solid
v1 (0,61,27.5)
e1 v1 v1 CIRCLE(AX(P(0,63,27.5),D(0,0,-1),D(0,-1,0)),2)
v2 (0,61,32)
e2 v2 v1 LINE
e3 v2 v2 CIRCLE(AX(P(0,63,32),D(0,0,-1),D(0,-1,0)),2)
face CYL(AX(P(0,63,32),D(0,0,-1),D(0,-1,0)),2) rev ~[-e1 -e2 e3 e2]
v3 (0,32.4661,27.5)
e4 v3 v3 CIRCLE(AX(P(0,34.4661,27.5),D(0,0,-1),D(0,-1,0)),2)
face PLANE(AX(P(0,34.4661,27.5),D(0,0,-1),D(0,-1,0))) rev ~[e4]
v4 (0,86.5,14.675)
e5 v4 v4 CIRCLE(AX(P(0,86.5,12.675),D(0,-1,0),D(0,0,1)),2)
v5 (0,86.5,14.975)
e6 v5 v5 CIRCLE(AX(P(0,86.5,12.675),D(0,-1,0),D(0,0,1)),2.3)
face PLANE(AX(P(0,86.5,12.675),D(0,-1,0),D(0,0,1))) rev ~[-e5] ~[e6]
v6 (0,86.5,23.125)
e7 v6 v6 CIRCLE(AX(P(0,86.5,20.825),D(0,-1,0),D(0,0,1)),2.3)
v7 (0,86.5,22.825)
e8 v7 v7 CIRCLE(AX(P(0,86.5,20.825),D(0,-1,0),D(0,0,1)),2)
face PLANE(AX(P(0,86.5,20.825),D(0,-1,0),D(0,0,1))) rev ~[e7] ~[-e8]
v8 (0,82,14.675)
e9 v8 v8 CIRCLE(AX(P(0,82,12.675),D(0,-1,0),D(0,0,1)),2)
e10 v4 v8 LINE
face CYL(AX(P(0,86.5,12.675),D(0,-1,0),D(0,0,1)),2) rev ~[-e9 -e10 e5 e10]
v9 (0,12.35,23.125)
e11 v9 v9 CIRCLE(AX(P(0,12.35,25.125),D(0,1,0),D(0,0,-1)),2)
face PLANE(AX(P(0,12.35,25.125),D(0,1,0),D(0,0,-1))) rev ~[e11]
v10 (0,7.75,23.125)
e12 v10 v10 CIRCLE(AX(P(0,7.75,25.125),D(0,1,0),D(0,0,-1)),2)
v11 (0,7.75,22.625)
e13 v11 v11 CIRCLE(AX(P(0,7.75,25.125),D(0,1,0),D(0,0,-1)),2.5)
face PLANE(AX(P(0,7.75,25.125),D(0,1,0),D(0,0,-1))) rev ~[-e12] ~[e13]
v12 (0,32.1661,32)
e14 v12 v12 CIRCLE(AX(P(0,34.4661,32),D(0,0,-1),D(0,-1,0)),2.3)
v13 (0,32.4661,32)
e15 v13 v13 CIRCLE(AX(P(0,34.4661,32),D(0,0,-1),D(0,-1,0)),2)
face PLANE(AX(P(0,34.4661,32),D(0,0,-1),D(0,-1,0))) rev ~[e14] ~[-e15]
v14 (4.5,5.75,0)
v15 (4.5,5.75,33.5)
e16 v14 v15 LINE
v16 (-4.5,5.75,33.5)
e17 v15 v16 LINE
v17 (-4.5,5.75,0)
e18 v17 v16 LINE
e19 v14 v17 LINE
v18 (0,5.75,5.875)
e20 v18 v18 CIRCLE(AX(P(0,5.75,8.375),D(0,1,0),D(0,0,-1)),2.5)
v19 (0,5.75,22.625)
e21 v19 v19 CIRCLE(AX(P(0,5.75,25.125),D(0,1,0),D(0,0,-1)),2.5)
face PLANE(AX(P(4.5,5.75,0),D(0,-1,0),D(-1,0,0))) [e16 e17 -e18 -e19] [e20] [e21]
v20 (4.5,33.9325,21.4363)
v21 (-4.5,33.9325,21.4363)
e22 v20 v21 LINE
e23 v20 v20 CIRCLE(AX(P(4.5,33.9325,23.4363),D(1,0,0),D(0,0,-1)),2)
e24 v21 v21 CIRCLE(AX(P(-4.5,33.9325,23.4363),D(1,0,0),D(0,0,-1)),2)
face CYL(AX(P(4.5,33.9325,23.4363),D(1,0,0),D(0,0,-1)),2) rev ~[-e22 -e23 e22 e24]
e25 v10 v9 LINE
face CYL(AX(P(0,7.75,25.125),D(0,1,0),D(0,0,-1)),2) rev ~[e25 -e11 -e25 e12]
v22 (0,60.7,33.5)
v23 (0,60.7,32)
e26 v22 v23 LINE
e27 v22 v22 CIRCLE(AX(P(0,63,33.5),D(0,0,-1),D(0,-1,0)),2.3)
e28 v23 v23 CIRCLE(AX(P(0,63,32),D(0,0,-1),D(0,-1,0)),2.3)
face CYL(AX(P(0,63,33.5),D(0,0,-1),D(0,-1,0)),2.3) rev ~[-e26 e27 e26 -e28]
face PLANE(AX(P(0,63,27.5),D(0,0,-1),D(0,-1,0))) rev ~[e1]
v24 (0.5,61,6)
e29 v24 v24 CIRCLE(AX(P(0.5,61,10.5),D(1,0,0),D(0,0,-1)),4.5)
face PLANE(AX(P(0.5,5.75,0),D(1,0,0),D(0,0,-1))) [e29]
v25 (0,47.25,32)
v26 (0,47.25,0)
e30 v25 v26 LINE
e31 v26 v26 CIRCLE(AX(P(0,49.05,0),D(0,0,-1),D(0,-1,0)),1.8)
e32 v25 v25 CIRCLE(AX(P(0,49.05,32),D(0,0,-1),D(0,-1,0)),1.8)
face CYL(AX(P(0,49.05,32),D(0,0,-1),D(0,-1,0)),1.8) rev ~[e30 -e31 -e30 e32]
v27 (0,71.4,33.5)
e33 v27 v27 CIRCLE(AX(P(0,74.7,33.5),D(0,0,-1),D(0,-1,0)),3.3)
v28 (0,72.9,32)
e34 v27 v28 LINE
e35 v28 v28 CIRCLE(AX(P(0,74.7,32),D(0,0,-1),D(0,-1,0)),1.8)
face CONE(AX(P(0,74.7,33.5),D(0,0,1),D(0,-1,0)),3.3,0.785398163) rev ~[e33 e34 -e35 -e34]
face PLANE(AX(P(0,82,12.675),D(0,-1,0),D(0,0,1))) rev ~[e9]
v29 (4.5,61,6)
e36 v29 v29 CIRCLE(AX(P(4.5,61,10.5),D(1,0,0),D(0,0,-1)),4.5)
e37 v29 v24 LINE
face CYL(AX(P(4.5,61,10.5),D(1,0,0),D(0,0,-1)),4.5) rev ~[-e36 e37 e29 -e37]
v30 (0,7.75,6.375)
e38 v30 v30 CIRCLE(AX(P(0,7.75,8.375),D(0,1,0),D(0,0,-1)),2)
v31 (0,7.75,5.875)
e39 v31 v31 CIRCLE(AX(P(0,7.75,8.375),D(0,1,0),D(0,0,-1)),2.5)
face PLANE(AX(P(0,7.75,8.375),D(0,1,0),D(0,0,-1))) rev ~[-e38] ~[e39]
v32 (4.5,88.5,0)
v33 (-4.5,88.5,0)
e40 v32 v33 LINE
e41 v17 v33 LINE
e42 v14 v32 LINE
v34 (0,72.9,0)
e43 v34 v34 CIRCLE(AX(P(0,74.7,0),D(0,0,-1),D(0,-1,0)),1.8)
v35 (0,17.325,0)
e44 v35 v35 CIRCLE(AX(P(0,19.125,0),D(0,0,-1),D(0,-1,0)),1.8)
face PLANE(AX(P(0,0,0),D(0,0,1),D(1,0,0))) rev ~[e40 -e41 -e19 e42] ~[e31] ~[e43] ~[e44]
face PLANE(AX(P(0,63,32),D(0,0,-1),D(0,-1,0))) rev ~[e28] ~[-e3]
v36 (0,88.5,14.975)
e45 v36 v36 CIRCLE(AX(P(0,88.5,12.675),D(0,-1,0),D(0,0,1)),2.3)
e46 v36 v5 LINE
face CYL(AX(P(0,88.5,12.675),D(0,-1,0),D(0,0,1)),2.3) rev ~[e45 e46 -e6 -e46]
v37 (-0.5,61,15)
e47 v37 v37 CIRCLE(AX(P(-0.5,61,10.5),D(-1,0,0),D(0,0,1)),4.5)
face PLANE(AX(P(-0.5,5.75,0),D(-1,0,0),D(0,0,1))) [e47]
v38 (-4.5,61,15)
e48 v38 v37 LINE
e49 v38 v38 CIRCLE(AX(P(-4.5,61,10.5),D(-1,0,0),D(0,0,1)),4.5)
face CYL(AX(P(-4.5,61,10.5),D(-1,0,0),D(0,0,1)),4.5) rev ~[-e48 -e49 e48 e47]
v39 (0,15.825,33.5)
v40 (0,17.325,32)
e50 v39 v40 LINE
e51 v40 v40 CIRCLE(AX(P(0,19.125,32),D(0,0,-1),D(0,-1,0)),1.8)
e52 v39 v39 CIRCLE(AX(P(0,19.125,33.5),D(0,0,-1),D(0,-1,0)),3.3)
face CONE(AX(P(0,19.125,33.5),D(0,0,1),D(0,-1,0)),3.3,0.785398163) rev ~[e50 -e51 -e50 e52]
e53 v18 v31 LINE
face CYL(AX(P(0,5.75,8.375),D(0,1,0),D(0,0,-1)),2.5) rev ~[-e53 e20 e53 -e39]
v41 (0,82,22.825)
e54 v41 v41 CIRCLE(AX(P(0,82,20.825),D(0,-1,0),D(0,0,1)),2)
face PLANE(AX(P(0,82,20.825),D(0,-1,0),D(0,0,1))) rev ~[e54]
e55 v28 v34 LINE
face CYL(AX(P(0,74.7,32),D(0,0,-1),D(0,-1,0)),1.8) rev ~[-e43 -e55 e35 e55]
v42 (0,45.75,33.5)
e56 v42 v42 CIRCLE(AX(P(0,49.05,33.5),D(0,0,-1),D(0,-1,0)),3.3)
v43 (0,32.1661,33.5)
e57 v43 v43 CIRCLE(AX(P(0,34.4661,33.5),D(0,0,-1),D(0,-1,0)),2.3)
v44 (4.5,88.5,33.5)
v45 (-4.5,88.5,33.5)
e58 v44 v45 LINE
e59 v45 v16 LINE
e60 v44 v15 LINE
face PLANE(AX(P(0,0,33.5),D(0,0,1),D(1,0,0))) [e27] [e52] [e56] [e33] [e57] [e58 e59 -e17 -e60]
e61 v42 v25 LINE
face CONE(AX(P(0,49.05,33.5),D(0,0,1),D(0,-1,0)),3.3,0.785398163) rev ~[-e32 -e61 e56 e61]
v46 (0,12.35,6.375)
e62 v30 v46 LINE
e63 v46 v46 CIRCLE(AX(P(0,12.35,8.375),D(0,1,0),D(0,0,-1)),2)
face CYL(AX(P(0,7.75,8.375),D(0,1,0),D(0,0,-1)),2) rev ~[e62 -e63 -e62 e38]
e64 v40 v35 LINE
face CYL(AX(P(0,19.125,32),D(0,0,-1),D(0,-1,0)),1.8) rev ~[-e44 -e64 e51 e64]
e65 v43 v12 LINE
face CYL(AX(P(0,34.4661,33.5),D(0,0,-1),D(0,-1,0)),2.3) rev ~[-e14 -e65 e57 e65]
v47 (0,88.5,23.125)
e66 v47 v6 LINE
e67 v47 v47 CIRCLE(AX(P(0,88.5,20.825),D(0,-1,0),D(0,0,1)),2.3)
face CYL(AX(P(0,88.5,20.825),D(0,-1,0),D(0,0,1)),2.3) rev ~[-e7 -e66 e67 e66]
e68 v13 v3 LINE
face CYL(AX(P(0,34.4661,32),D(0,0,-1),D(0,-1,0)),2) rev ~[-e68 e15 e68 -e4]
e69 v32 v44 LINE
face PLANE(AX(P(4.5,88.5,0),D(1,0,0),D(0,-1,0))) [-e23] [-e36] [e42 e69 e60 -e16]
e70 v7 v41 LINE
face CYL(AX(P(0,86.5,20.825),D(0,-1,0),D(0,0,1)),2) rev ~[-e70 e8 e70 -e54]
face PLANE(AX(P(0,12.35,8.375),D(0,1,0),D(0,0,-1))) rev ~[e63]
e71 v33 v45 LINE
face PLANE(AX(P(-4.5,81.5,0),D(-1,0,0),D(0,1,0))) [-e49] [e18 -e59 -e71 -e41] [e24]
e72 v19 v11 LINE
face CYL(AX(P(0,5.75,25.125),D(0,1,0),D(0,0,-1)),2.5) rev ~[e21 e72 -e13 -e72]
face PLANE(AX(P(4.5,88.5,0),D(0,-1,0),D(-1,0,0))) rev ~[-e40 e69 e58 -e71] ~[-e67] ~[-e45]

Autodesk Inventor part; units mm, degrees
ref_plane "YZ Plane" through (0, 0, 0) normal (1, 0, 0) x (0, 1, 0)
ref_plane "XZ Plane" through (0, 0, 0) normal (0, 1, 0) x (-1, 0, 0)
ref_plane "Work Plane1" through (0, 0, 0) normal (0, 0, 1) x (1, 0, 0)
ref_plane "Work Plane2" through (-89, -40.3889, 33.5) normal (0, 0, 1) x (1, 0, 0)
sketch "Sketch1" plane through (0, 0, 0) normal (0, 0, 1) x (1, 0, 0)
  line L0 (23.5, 88.5) -> (-23.5, 88.5) projected
  line L1 (-23.5, 88.5) -> (-23.5, 36.5) projected
  line L2 (-26.5, 33.5) -> (-89, 33.5) projected
  line L3 (-89, 33.5) -> (-89, -72.5) projected
  line L4 (-89, -72.5) -> (-77, -72.5) projected
  line L5 (-74, -75.5) -> (-74, -93.5) projected
  line L6 (-74, -93.5) -> (74, -93.5) projected
  line L7 (74, -93.5) -> (74, -75.5) projected
  line L8 (77, -72.5) -> (89, -72.5) projected
  line L9 (89, -72.5) -> (89, 33.5) projected
  line L10 (89, 33.5) -> (26.5, 33.5) projected
  line L11 (23.5, 36.5) -> (23.5, 88.5) projected
  line L12 (-4.5, 81.5) -> (-4.5, 36.5) projected
  line L13 (-7.5, 33.5) -> (-13.5, 33.5) projected
  line L14 (-16.5, 36.5) -> (-16.5, 81.5) projected
  line L15 (7.5, 84.5) -> (13.5, 84.5) projected
  line L16 (16.5, 81.5) -> (16.5, 36.5) projected
  line L17 (13.5, 33.5) -> (7.5, 33.5) projected
  line L18 (4.5, 36.5) -> (4.5, 81.5) projected
  line L19 (-13.5, 84.5) -> (-7.5, 84.5) projected
  line L20 (-4.5, 88.5) -> (4.5, 88.5)
  line L21 (4.5, 88.5) -> (4.5, 5.75)
  line L22 (4.5, 5.75) -> (-4.5, 5.75)
  line L23 (-4.5, 5.75) -> (-4.5, 88.5)
  line L24 (-32.2, 4.75) -> (-59.9, 4.75)
  arc A0 (13.5, 33.5) -> (16.5, 36.5) centre (13.5, 36.5) ccw projected
  arc A1 (4.5, 36.5) -> (7.5, 33.5) centre (7.5, 36.5) ccw projected
  arc A2 (7.5, 84.5) -> (4.5, 81.5) centre (7.5, 81.5) ccw projected
  arc A3 (16.5, 81.5) -> (13.5, 84.5) centre (13.5, 81.5) ccw projected
  arc A4 (-4.5, 81.5) -> (-7.5, 84.5) centre (-7.5, 81.5) ccw projected
  arc A5 (-7.5, 33.5) -> (-4.5, 36.5) centre (-7.5, 36.5) ccw projected
  arc A6 (-16.5, 36.5) -> (-13.5, 33.5) centre (-13.5, 36.5) ccw projected
  arc A7 (-13.5, 84.5) -> (-16.5, 81.5) centre (-13.5, 81.5) ccw projected
  arc A8 (-26.5, 33.5) -> (-23.5, 36.5) centre (-26.5, 36.5) ccw projected
  arc A9 (-74, -75.5) -> (-77, -72.5) centre (-77, -75.5) ccw projected
  arc A10 (77, -72.5) -> (74, -75.5) centre (77, -75.5) ccw projected
  arc A11 (23.5, 36.5) -> (26.5, 33.5) centre (26.5, 36.5) ccw projected
  circle A12 centre (21.5, -85.5) radius 1.8 projected
  circle A13 centre (-64.5, -85.5) radius 1.8 projected
  circle A14 centre (83.4, -16.3889) radius 1.8 projected
  circle A15 centre (-83.4, -19.2889) radius 1.8 projected
  circle A16 centre (-21.5, -85.5) radius 1.8 projected
  circle A17 centre (64.5, -85.5) radius 1.8 projected
  circle A18 centre (39.125, 4.3375) radius 1.0065 projected
  circle A19 centre (-72.95, 4.275) radius 1.0065 projected
  circle A20 centre (39.125, 25.9125) radius 1.0065 projected
  circle A21 centre (72.95, 12.275) radius 1.0065 projected
  circle A22 centre (86, 30.5) radius 1.0065 projected
  circle A23 centre (-86, 30.5) radius 1.0065 projected
  circle A24 centre (-39.125, 12.3375) radius 1.0065 projected
  circle A25 centre (-72.95, 25.975) radius 1.0065 projected
  circle A26 centre (-72.95, 12.275) radius 1.0065 projected
  circle A27 centre (-39.125, 25.9125) radius 1.0065 projected
  circle A28 centre (-86, 7.75) radius 1.0065 projected
  circle A29 centre (86, 7.75) radius 1.0065 projected
  circle A30 centre (72.95, 25.975) radius 1.0065 projected
  circle A31 centre (39.125, 12.3375) radius 1.0065 projected
  circle A32 centre (-39.125, 4.3375) radius 1.0065 projected
  circle A33 centre (72.95, 4.275) radius 1.0065 projected
  circle A34 centre (78, -67.1725) radius 1.2295 projected
  circle A35 centre (-24.1, -73.1) radius 1.2295 projected
  circle A36 centre (24.1, -24.9) radius 1.2295 projected
  circle A37 centre (-42.4984, -44.6666) radius 1.2295 projected
  circle A38 centre (-79, -42.3889) radius 1.2295 projected
  circle A39 centre (-19.5, 28.875) radius 1.2295 projected
  circle A40 centre (19.5, 9.55) radius 1.2295 projected
  circle A41 centre (19.5, 47.3) radius 1.2295 projected
  circle A42 centre (-19.5, 47.3) radius 1.2295 projected
  circle A43 centre (0, 74.7) radius 1.2295 projected
  circle A44 centre (-19.4231, 74.8077) radius 1.2295 projected
  circle A45 centre (19.5, 74.7) radius 1.2295 projected
  circle A46 centre (0, 49.05) radius 1.2295 projected
  circle A47 centre (19.5, 28.875) radius 1.2295 projected
  circle A48 centre (0, 19.125) radius 1.2295 projected
  circle A49 centre (-19.5, 9.55) radius 1.2295 projected
  circle A50 centre (-78, -67.1725) radius 1.2295 projected
  circle A51 centre (-24.1, -24.9) radius 1.2295 projected
  circle A52 centre (24.1, -73.1) radius 1.2295 projected
  circle A53 centre (42.5, -44.6649) radius 1.2295 projected
  circle A54 centre (79, -42.3889) radius 1.2295 projected
  line L25 (74, -12.9454) -> (74, -38.6649) projected
  line L26 (64.9252, -4.7177) -> (45.9707, -26.1743) projected
  line L27 (40.7223, -24.1882) -> (40.7223, -2.7315) projected
  line L28 (-62.6769, 0.2685) -> (-43.7223, 0.2685) projected
  line L29 (-35.4307, -48.6788) -> (-25.9833, -59.3733) projected
  line L30 (-74, -38.6649) -> (-74, -12.9454) projected
  line L31 (-31.7223, 0.2685) -> (-15.0791, 0.2685) projected
  line L32 (-40.7223, -2.7315) -> (-40.7223, -24.1882) projected
  line L33 (-10.2484, -66.6122) -> (-32.5736, -41.3399) projected
  line L34 (25.9833, -59.3733) -> (35.4307, -48.6788) projected
  line L35 (43.7223, 0.2685) -> (62.6769, 0.2685) projected
  line L36 (34.7223, -2.7315) -> (34.7223, -24.9078) projected
  line L37 (29.5555, -26.9826) -> (10.5667, -7.1519) projected
  line L38 (-68.7516, -10.9592) -> (-46.0313, -36.6788) projected
  line L39 (-10.5667, -7.1519) -> (-29.5555, -26.9826) projected
  line L40 (-34.7223, -24.9078) -> (-34.7223, -2.7315) projected
  line L41 (15.0791, 0.2685) -> (31.7223, 0.2685) projected
  line L42 (46.0313, -36.6788) -> (68.7516, -10.9592) projected
  line L43 (32.5736, -41.3399) -> (10.2484, -66.6122) projected
  line L44 (-45.9707, -26.1743) -> (-64.9252, -4.7177) projected
  line L45 (-32.4921, -37.2789) -> (-10.1668, -13.9638) projected
  line L46 (10.1668, -13.9638) -> (32.4921, -37.2789) projected
  line L47 (29.5955, -81.1563) -> (25.3044, -62.0157) projected
  arc A55 (25.9833, -59.3733) -> (25.3044, -62.0157) centre (28.2317, -61.3594) ccw projected
  arc A56 (37.679, -47.6649) -> (35.4307, -48.6788) centre (37.679, -50.6649) ccw projected
  line L48 (37.679, -47.6649) -> (68.9203, -47.6649) projected
  arc A57 (71.5475, -52.1134) -> (68.9203, -47.6649) centre (68.9203, -50.6649) ccw projected
  line L49 (71.5475, -52.1134) -> (55.0988, -81.9484) projected
  arc A58 (52.4716, -83.5) -> (55.0988, -81.9484) centre (52.4716, -80.5) ccw projected
  line L50 (52.4716, -83.5) -> (32.5229, -83.5) projected
  arc A59 (29.5955, -81.1563) -> (32.5229, -83.5) centre (32.5229, -80.5) ccw projected
  line L51 (-5, -16.0387) -> (-5, -64.6261) projected
  arc A60 (-10.2484, -66.6122) -> (-5, -64.6261) centre (-8, -64.6261) ccw projected
  arc A61 (-32.4921, -37.2789) -> (-32.5736, -41.3399) centre (-30.3253, -39.3537) ccw projected
  arc A62 (-5, -16.0387) -> (-10.1668, -13.9638) centre (-8, -16.0387) ccw projected
  arc A63 (-40.7223, -2.7315) -> (-43.7223, 0.2685) centre (-43.7223, -2.7315) ccw projected
  arc A64 (-45.9707, -26.1743) -> (-40.7223, -24.1882) centre (-43.7223, -24.1882) ccw projected
  arc A65 (-62.6769, 0.2685) -> (-64.9252, -4.7177) centre (-62.6769, -2.7315) ccw projected
  arc A66 (-25.3044, -62.0157) -> (-25.9833, -59.3733) centre (-28.2317, -61.3594) ccw projected
  line L52 (-25.3044, -62.0157) -> (-29.5955, -81.1563) projected
  arc A67 (-32.5229, -83.5) -> (-29.5955, -81.1563) centre (-32.5229, -80.5) ccw projected
  line L53 (-32.5229, -83.5) -> (-52.4716, -83.5) projected
  arc A68 (-55.0988, -81.9484) -> (-52.4716, -83.5) centre (-52.4716, -80.5) ccw projected
  line L54 (-55.0988, -81.9484) -> (-71.5475, -52.1134) projected
  arc A69 (-68.9203, -47.6649) -> (-71.5475, -52.1134) centre (-68.9203, -50.6649) ccw projected
  line L55 (-68.9203, -47.6649) -> (-37.679, -47.6649) projected
  arc A70 (-35.4307, -48.6788) -> (-37.679, -47.6649) centre (-37.679, -50.6649) ccw projected
  line L56 (-49.775, 11.125) -> (-62.3, 11.125) projected
  arc A71 (-62.3, 27.125) -> (-62.3, 11.125) centre (-62.3, 19.125) ccw projected
  line L57 (-62.3, 27.125) -> (-49.775, 27.125) projected
  arc A72 (-49.775, 11.125) -> (-49.775, 27.125) centre (-49.775, 19.125) ccw projected
  arc A73 (-31.7223, 0.2685) -> (-34.7223, -2.7315) centre (-31.7223, -2.7315) ccw projected
  arc A74 (-12.9578, -0.6102) -> (-15.0791, 0.2685) centre (-15.0791, -2.7315) ccw projected
  line L58 (-12.9578, -0.6102) -> (-10.6122, -2.9558) projected
  arc A75 (-10.5667, -7.1519) -> (-10.6122, -2.9558) centre (-12.7335, -5.0771) ccw projected
  arc A76 (-34.7223, -24.9078) -> (-29.5555, -26.9826) centre (-31.7223, -24.9078) ccw projected
  arc A77 (71, -41.6649) -> (74, -38.6649) centre (71, -38.6649) ccw projected
  line L59 (71, -41.6649) -> (48.2797, -41.6649) projected
  arc A78 (46.0313, -36.6788) -> (48.2797, -41.6649) centre (48.2797, -38.6649) ccw projected
  arc A79 (74, -12.9454) -> (68.7516, -10.9592) centre (71, -12.9454) ccw projected
  arc A80 (40.7223, -24.1882) -> (45.9707, -26.1743) centre (43.7223, -24.1882) ccw projected
  arc A81 (43.7223, 0.2685) -> (40.7223, -2.7315) centre (43.7223, -2.7315) ccw projected
  arc A82 (64.9252, -4.7177) -> (62.6769, 0.2685) centre (62.6769, -2.7315) ccw projected
  arc A83 (5, -64.6261) -> (10.2484, -66.6122) centre (8, -64.6261) ccw projected
  line L60 (5, -64.6261) -> (5, -16.0387) projected
  arc A84 (10.1668, -13.9638) -> (5, -16.0387) centre (8, -16.0387) ccw projected
  arc A85 (32.5736, -41.3399) -> (32.4921, -37.2789) centre (30.3253, -39.3537) ccw projected
  arc A86 (29.5555, -26.9826) -> (34.7223, -24.9078) centre (31.7223, -24.9078) ccw projected
  arc A87 (10.6122, -2.9558) -> (10.5667, -7.1519) centre (12.7335, -5.0771) ccw projected
  line L61 (10.6122, -2.9558) -> (12.9578, -0.6102) projected
  arc A88 (15.0791, 0.2685) -> (12.9578, -0.6102) centre (15.0791, -2.7315) ccw projected
  arc A89 (34.7223, -2.7315) -> (31.7223, 0.2685) centre (31.7223, -2.7315) ccw projected
  arc A90 (-48.2797, -41.6649) -> (-46.0313, -36.6788) centre (-48.2797, -38.6649) ccw projected
  line L62 (-48.2797, -41.6649) -> (-71, -41.6649) projected
  arc A91 (-74, -38.6649) -> (-71, -41.6649) centre (-71, -38.6649) ccw projected
  arc A92 (-68.7516, -10.9592) -> (-74, -12.9454) centre (-71, -12.9454) ccw projected
  line L63 (49.775, 27.125) -> (62.3, 27.125) projected
  arc A93 (62.3, 11.125) -> (62.3, 27.125) centre (62.3, 19.125) ccw projected
  line L64 (62.3, 11.125) -> (49.775, 11.125) projected
  arc A94 (49.775, 27.125) -> (49.775, 11.125) centre (49.775, 19.125) ccw projected
  point P0 (0, 0)
  point P1 (-4.5, 81.5)
  point P2 (-4.5, 36.5)
  point P3 (7.5, 81.5)
  point P4 (13.5, 81.5)
  point P5 (-7.5, 81.5)
  point P6 (-13.5, 81.5)
  point P7 (-29, -78.5)
  point P8 (-57, -78.5)
  point P9 (29, -78.5)
  point P10 (57, -78.5)
  dimension "d41" = 1
extrude "Extrusion1" add sketch "Sketch1" along normal up to surface (33.5 mm away) contours L21 L18 L22 L23 L12 L0 | A43 | A46 | A48
sketch "Sketch2" plane through (4.5, 5.75, 0) normal (1, 0, 0) x (0, 0, -1)
  circle A0 centre (-23.4363, 28.1825) radius 2 projected
  point P0 (0, -5.75)
extrude "Extrusion2" cut sketch "Sketch2" against normal blind 10
sketch "Sketch3" plane through (4.5, 5.75, 0) normal (1, 0, 0) x (0, 0, -1)
  circle A0 centre (-10.5, 55.25) radius 4.5 projected
  point P0 (0, -5.75)
extrude "Extrusion3" cut sketch "Sketch3" against normal blind 4
sketch "Sketch4" plane through (-4.5, 5.75, 0) normal (-1, 0, 0) x (0, 0, 1)
  circle A0 centre (10.5, 55.25) radius 4.5 projected
  point P0 (0, -5.75)
extrude "Extrusion4" cut sketch "Sketch4" against normal blind 4
sketch "Sketch5" plane through (-4.5, 5.75, 33.5) normal (0, 0, 1) x (1, 0, 0)
  line L0 (5, 59.75) -> (5, 50.75) projected
  line L1 (4, 50.75) -> (4, 59.75) projected
  line L2 (9, 26.1825) -> (0, 26.1825) projected
  line L3 (9, 30.1825) -> (0, 30.1825) projected
  line L4 (17, 78.15) -> (-8, 78.15)
  line L5 (-8, 35.85) -> (17, 35.85)
  line L6 (9, 82.75) -> (9, 0) projected
  line L7 (0, 50.75) -> (0, 59.75) projected
  line L8 (9, 35.85) -> (0, 35.85)
  line L9 (0, 35.85) -> (0, 50.75)
  line L10 (0, 50.75) -> (9, 50.75)
  line L11 (9, 50.75) -> (9, 35.85)
  line L12 (0, 0) -> (0, 82.75) projected
  line L13 (9, 78.15) -> (0, 78.15)
  line L14 (0, 78.15) -> (0, 59.75)
  line L15 (0, 59.75) -> (9, 59.75)
  line L16 (9, 59.75) -> (9, 78.15)
  line L17 (-18, 6.625) -> (-18, 20.125) projected
  line L18 (-18, 13.375) -> (27, 13.375)
  line L19 (9, 35.85) -> (0, 50.75)
  line L20 (9, 59.75) -> (9, 50.75) projected
  line L21 (0, 35.85) -> (9, 50.75)
  line L22 (9, 59.75) -> (0, 78.15)
  line L23 (0, 59.75) -> (9, 78.15)
  point P0 (4.5, -5.75)
  point P1 (4.5, 13.375)
  point P2 (4.5, 43.3)
  point P3 (4.5, 68.95)
  dimension "d9" = 4.5
  dimension "d10" = 4.5
hole "Hole1" at (0, 19.125, 33.5) at (0, 49.05, 33.5) at (0, 74.7, 33.5) direction (0, 0, -1) diameter 3.6 end through all countersink diameter 6.6 countersink angle 90 clearance for "Countersunk Flat Head Screw ISO 2009/7046" size "M3" standard "ISO"
sketch "Sketch6" plane through (-4.5, 5.75, 0) normal (0, -1, 0) x (1, 0, 0)
  line L0 (9, 33.5) -> (0, 33.5) projected
  line L1 (0, 0) -> (0, 33.5) projected
  line L2 (0, 0) -> (9, 0) projected
  line L3 (9, 0) -> (9, 33.5) projected
  line L4 (0, 16.75) -> (9, 16.75)
  line L5 (9, 16.75) -> (0, 33.5)
  line L6 (9, 33.5) -> (0, 16.75)
  line L7 (0, 16.75) -> (9, 0)
  line L8 (9, 16.75) -> (0, 0)
  point P0 (4.5, 0)
  point P1 (4.5, 8.375)
  point P2 (4.5, 25.125)
hole "Hole2" at (0, 5.75, 8.375) at (0, 5.75, 25.125) direction (0, 1, 0) diameter 4 depth 6.6 counterbore diameter 5 counterbore depth 2
sketch "Sketch7" plane through (-4.5, 88.5, 0) normal (0, 1, 0) x (1, 0, 0)
  line L0 (0, -33.5) -> (9, -33.5) projected
  line L1 (0, -33.5) -> (9, -33.5) projected
  line L2 (9, 0) -> (9, -33.5) projected
  line L3 (9, 0) -> (0, 0) projected
  line L4 (0, 0) -> (0, -33.5) projected
  line L5 (-8, -1.4) -> (-8, -6.6) projected
  line L6 (-8, -32.1) -> (-8, -26.9) projected
  line L7 (17, -32.1) -> (17, -26.9) projected
  line L8 (17, -1.4) -> (17, -6.6) projected
  line L9 (17, -32.1) -> (-8, -32.1)
  line L10 (-8, -32.1) -> (-8, -26.9)
  line L11 (-8, -26.9) -> (17, -26.9)
  line L12 (17, -26.9) -> (17, -32.1)
  line L13 (-8, -6.6) -> (17, -6.6)
  line L14 (17, -6.6) -> (17, -1.4)
  line L15 (17, -1.4) -> (-8, -1.4)
  line L16 (-8, -1.4) -> (-8, -6.6)
  line L17 (17, -6.6) -> (-8, -6.6)
  line L18 (-8, -6.6) -> (-8, -8.6)
  line L19 (-8, -8.6) -> (17, -8.6)
  line L20 (17, -8.6) -> (17, -6.6)
  line L21 (-8, -26.9) -> (17, -26.9)
  line L22 (17, -26.9) -> (17, -24.9)
  line L23 (17, -24.9) -> (-8, -24.9)
  line L24 (-8, -24.9) -> (-8, -26.9)
  line L25 (9, 0) -> (9, -33.5) projected
  line L26 (9, -16.75) -> (0, -16.75)
  line L27 (0, 0) -> (0, -33.5) projected
  line L28 (9, -24.9) -> (0, -16.75)
  line L29 (9, -8.6) -> (0, -16.75)
  line L30 (0, -8.6) -> (9, -16.75)
  line L31 (9, -16.75) -> (0, -24.9)
  point P0 (4.5, 0)
  point P1 (4.5, -20.825)
  point P2 (4.5, -12.675)
  dimension "d25" = 2
  dimension "d26" = 2
hole "Hole3" at (0, 88.5, 20.825) at (0, 88.5, 12.675) direction (0, -1, 0) diameter 4 depth 6.5 counterbore diameter 4.6 counterbore depth 2
sketch "Sketch8" plane through (-4.5, 5.75, 33.5) normal (0, 0, 1) x (1, 0, 0)
  line L0 (26, 27.2497) -> (-17, 27.2497)
  line L1 (26, 31.2497) -> (-17, 31.2497)
  line L2 (4, 52.75) -> (-1, 52.75)
  line L3 (4, 61.75) -> (-1, 61.75)
  line L4 (10, 61.75) -> (5, 61.75)
  line L5 (9, 50.75) -> (5, 50.75) projected
  line L6 (0, 0) -> (0, 82.75) projected
  line L7 (9, 52.75) -> (0, 52.75)
  line L8 (0, 52.75) -> (0, 61.75)
  line L9 (0, 61.75) -> (9, 61.75)
  line L10 (9, 61.75) -> (9, 50.75)
  line L11 (9, 26.1825) -> (0, 26.1825) projected
  line L12 (0, 31.2497) -> (9, 31.2497)
  line L13 (9, 31.2497) -> (9, 26.1825)
  line L14 (9, 26.1825) -> (0, 26.1825)
  line L15 (0, 26.1825) -> (0, 31.2497)
  line L16 (9, 26.1825) -> (0, 31.2497)
  line L17 (0, 26.1825) -> (9, 31.2497)
  line L18 (10, 51.75) -> (0, 61.75)
  line L19 (0, 52.75) -> (9, 61.75)
  point P0 (4.5, -5.75)
  point P1 (4.5, 28.7161)
  point P2 (4.5, 57.25)
hole "Hole4" at (0, 34.4661, 33.5) at (0, 63, 33.5) direction (0, 0, -1) diameter 4 depth 6 counterbore diameter 4.6 counterbore depth 1.5
equation "\"d9\" = d10"
properties part number "middle_gear_holder" material "Nylon 6/6"
